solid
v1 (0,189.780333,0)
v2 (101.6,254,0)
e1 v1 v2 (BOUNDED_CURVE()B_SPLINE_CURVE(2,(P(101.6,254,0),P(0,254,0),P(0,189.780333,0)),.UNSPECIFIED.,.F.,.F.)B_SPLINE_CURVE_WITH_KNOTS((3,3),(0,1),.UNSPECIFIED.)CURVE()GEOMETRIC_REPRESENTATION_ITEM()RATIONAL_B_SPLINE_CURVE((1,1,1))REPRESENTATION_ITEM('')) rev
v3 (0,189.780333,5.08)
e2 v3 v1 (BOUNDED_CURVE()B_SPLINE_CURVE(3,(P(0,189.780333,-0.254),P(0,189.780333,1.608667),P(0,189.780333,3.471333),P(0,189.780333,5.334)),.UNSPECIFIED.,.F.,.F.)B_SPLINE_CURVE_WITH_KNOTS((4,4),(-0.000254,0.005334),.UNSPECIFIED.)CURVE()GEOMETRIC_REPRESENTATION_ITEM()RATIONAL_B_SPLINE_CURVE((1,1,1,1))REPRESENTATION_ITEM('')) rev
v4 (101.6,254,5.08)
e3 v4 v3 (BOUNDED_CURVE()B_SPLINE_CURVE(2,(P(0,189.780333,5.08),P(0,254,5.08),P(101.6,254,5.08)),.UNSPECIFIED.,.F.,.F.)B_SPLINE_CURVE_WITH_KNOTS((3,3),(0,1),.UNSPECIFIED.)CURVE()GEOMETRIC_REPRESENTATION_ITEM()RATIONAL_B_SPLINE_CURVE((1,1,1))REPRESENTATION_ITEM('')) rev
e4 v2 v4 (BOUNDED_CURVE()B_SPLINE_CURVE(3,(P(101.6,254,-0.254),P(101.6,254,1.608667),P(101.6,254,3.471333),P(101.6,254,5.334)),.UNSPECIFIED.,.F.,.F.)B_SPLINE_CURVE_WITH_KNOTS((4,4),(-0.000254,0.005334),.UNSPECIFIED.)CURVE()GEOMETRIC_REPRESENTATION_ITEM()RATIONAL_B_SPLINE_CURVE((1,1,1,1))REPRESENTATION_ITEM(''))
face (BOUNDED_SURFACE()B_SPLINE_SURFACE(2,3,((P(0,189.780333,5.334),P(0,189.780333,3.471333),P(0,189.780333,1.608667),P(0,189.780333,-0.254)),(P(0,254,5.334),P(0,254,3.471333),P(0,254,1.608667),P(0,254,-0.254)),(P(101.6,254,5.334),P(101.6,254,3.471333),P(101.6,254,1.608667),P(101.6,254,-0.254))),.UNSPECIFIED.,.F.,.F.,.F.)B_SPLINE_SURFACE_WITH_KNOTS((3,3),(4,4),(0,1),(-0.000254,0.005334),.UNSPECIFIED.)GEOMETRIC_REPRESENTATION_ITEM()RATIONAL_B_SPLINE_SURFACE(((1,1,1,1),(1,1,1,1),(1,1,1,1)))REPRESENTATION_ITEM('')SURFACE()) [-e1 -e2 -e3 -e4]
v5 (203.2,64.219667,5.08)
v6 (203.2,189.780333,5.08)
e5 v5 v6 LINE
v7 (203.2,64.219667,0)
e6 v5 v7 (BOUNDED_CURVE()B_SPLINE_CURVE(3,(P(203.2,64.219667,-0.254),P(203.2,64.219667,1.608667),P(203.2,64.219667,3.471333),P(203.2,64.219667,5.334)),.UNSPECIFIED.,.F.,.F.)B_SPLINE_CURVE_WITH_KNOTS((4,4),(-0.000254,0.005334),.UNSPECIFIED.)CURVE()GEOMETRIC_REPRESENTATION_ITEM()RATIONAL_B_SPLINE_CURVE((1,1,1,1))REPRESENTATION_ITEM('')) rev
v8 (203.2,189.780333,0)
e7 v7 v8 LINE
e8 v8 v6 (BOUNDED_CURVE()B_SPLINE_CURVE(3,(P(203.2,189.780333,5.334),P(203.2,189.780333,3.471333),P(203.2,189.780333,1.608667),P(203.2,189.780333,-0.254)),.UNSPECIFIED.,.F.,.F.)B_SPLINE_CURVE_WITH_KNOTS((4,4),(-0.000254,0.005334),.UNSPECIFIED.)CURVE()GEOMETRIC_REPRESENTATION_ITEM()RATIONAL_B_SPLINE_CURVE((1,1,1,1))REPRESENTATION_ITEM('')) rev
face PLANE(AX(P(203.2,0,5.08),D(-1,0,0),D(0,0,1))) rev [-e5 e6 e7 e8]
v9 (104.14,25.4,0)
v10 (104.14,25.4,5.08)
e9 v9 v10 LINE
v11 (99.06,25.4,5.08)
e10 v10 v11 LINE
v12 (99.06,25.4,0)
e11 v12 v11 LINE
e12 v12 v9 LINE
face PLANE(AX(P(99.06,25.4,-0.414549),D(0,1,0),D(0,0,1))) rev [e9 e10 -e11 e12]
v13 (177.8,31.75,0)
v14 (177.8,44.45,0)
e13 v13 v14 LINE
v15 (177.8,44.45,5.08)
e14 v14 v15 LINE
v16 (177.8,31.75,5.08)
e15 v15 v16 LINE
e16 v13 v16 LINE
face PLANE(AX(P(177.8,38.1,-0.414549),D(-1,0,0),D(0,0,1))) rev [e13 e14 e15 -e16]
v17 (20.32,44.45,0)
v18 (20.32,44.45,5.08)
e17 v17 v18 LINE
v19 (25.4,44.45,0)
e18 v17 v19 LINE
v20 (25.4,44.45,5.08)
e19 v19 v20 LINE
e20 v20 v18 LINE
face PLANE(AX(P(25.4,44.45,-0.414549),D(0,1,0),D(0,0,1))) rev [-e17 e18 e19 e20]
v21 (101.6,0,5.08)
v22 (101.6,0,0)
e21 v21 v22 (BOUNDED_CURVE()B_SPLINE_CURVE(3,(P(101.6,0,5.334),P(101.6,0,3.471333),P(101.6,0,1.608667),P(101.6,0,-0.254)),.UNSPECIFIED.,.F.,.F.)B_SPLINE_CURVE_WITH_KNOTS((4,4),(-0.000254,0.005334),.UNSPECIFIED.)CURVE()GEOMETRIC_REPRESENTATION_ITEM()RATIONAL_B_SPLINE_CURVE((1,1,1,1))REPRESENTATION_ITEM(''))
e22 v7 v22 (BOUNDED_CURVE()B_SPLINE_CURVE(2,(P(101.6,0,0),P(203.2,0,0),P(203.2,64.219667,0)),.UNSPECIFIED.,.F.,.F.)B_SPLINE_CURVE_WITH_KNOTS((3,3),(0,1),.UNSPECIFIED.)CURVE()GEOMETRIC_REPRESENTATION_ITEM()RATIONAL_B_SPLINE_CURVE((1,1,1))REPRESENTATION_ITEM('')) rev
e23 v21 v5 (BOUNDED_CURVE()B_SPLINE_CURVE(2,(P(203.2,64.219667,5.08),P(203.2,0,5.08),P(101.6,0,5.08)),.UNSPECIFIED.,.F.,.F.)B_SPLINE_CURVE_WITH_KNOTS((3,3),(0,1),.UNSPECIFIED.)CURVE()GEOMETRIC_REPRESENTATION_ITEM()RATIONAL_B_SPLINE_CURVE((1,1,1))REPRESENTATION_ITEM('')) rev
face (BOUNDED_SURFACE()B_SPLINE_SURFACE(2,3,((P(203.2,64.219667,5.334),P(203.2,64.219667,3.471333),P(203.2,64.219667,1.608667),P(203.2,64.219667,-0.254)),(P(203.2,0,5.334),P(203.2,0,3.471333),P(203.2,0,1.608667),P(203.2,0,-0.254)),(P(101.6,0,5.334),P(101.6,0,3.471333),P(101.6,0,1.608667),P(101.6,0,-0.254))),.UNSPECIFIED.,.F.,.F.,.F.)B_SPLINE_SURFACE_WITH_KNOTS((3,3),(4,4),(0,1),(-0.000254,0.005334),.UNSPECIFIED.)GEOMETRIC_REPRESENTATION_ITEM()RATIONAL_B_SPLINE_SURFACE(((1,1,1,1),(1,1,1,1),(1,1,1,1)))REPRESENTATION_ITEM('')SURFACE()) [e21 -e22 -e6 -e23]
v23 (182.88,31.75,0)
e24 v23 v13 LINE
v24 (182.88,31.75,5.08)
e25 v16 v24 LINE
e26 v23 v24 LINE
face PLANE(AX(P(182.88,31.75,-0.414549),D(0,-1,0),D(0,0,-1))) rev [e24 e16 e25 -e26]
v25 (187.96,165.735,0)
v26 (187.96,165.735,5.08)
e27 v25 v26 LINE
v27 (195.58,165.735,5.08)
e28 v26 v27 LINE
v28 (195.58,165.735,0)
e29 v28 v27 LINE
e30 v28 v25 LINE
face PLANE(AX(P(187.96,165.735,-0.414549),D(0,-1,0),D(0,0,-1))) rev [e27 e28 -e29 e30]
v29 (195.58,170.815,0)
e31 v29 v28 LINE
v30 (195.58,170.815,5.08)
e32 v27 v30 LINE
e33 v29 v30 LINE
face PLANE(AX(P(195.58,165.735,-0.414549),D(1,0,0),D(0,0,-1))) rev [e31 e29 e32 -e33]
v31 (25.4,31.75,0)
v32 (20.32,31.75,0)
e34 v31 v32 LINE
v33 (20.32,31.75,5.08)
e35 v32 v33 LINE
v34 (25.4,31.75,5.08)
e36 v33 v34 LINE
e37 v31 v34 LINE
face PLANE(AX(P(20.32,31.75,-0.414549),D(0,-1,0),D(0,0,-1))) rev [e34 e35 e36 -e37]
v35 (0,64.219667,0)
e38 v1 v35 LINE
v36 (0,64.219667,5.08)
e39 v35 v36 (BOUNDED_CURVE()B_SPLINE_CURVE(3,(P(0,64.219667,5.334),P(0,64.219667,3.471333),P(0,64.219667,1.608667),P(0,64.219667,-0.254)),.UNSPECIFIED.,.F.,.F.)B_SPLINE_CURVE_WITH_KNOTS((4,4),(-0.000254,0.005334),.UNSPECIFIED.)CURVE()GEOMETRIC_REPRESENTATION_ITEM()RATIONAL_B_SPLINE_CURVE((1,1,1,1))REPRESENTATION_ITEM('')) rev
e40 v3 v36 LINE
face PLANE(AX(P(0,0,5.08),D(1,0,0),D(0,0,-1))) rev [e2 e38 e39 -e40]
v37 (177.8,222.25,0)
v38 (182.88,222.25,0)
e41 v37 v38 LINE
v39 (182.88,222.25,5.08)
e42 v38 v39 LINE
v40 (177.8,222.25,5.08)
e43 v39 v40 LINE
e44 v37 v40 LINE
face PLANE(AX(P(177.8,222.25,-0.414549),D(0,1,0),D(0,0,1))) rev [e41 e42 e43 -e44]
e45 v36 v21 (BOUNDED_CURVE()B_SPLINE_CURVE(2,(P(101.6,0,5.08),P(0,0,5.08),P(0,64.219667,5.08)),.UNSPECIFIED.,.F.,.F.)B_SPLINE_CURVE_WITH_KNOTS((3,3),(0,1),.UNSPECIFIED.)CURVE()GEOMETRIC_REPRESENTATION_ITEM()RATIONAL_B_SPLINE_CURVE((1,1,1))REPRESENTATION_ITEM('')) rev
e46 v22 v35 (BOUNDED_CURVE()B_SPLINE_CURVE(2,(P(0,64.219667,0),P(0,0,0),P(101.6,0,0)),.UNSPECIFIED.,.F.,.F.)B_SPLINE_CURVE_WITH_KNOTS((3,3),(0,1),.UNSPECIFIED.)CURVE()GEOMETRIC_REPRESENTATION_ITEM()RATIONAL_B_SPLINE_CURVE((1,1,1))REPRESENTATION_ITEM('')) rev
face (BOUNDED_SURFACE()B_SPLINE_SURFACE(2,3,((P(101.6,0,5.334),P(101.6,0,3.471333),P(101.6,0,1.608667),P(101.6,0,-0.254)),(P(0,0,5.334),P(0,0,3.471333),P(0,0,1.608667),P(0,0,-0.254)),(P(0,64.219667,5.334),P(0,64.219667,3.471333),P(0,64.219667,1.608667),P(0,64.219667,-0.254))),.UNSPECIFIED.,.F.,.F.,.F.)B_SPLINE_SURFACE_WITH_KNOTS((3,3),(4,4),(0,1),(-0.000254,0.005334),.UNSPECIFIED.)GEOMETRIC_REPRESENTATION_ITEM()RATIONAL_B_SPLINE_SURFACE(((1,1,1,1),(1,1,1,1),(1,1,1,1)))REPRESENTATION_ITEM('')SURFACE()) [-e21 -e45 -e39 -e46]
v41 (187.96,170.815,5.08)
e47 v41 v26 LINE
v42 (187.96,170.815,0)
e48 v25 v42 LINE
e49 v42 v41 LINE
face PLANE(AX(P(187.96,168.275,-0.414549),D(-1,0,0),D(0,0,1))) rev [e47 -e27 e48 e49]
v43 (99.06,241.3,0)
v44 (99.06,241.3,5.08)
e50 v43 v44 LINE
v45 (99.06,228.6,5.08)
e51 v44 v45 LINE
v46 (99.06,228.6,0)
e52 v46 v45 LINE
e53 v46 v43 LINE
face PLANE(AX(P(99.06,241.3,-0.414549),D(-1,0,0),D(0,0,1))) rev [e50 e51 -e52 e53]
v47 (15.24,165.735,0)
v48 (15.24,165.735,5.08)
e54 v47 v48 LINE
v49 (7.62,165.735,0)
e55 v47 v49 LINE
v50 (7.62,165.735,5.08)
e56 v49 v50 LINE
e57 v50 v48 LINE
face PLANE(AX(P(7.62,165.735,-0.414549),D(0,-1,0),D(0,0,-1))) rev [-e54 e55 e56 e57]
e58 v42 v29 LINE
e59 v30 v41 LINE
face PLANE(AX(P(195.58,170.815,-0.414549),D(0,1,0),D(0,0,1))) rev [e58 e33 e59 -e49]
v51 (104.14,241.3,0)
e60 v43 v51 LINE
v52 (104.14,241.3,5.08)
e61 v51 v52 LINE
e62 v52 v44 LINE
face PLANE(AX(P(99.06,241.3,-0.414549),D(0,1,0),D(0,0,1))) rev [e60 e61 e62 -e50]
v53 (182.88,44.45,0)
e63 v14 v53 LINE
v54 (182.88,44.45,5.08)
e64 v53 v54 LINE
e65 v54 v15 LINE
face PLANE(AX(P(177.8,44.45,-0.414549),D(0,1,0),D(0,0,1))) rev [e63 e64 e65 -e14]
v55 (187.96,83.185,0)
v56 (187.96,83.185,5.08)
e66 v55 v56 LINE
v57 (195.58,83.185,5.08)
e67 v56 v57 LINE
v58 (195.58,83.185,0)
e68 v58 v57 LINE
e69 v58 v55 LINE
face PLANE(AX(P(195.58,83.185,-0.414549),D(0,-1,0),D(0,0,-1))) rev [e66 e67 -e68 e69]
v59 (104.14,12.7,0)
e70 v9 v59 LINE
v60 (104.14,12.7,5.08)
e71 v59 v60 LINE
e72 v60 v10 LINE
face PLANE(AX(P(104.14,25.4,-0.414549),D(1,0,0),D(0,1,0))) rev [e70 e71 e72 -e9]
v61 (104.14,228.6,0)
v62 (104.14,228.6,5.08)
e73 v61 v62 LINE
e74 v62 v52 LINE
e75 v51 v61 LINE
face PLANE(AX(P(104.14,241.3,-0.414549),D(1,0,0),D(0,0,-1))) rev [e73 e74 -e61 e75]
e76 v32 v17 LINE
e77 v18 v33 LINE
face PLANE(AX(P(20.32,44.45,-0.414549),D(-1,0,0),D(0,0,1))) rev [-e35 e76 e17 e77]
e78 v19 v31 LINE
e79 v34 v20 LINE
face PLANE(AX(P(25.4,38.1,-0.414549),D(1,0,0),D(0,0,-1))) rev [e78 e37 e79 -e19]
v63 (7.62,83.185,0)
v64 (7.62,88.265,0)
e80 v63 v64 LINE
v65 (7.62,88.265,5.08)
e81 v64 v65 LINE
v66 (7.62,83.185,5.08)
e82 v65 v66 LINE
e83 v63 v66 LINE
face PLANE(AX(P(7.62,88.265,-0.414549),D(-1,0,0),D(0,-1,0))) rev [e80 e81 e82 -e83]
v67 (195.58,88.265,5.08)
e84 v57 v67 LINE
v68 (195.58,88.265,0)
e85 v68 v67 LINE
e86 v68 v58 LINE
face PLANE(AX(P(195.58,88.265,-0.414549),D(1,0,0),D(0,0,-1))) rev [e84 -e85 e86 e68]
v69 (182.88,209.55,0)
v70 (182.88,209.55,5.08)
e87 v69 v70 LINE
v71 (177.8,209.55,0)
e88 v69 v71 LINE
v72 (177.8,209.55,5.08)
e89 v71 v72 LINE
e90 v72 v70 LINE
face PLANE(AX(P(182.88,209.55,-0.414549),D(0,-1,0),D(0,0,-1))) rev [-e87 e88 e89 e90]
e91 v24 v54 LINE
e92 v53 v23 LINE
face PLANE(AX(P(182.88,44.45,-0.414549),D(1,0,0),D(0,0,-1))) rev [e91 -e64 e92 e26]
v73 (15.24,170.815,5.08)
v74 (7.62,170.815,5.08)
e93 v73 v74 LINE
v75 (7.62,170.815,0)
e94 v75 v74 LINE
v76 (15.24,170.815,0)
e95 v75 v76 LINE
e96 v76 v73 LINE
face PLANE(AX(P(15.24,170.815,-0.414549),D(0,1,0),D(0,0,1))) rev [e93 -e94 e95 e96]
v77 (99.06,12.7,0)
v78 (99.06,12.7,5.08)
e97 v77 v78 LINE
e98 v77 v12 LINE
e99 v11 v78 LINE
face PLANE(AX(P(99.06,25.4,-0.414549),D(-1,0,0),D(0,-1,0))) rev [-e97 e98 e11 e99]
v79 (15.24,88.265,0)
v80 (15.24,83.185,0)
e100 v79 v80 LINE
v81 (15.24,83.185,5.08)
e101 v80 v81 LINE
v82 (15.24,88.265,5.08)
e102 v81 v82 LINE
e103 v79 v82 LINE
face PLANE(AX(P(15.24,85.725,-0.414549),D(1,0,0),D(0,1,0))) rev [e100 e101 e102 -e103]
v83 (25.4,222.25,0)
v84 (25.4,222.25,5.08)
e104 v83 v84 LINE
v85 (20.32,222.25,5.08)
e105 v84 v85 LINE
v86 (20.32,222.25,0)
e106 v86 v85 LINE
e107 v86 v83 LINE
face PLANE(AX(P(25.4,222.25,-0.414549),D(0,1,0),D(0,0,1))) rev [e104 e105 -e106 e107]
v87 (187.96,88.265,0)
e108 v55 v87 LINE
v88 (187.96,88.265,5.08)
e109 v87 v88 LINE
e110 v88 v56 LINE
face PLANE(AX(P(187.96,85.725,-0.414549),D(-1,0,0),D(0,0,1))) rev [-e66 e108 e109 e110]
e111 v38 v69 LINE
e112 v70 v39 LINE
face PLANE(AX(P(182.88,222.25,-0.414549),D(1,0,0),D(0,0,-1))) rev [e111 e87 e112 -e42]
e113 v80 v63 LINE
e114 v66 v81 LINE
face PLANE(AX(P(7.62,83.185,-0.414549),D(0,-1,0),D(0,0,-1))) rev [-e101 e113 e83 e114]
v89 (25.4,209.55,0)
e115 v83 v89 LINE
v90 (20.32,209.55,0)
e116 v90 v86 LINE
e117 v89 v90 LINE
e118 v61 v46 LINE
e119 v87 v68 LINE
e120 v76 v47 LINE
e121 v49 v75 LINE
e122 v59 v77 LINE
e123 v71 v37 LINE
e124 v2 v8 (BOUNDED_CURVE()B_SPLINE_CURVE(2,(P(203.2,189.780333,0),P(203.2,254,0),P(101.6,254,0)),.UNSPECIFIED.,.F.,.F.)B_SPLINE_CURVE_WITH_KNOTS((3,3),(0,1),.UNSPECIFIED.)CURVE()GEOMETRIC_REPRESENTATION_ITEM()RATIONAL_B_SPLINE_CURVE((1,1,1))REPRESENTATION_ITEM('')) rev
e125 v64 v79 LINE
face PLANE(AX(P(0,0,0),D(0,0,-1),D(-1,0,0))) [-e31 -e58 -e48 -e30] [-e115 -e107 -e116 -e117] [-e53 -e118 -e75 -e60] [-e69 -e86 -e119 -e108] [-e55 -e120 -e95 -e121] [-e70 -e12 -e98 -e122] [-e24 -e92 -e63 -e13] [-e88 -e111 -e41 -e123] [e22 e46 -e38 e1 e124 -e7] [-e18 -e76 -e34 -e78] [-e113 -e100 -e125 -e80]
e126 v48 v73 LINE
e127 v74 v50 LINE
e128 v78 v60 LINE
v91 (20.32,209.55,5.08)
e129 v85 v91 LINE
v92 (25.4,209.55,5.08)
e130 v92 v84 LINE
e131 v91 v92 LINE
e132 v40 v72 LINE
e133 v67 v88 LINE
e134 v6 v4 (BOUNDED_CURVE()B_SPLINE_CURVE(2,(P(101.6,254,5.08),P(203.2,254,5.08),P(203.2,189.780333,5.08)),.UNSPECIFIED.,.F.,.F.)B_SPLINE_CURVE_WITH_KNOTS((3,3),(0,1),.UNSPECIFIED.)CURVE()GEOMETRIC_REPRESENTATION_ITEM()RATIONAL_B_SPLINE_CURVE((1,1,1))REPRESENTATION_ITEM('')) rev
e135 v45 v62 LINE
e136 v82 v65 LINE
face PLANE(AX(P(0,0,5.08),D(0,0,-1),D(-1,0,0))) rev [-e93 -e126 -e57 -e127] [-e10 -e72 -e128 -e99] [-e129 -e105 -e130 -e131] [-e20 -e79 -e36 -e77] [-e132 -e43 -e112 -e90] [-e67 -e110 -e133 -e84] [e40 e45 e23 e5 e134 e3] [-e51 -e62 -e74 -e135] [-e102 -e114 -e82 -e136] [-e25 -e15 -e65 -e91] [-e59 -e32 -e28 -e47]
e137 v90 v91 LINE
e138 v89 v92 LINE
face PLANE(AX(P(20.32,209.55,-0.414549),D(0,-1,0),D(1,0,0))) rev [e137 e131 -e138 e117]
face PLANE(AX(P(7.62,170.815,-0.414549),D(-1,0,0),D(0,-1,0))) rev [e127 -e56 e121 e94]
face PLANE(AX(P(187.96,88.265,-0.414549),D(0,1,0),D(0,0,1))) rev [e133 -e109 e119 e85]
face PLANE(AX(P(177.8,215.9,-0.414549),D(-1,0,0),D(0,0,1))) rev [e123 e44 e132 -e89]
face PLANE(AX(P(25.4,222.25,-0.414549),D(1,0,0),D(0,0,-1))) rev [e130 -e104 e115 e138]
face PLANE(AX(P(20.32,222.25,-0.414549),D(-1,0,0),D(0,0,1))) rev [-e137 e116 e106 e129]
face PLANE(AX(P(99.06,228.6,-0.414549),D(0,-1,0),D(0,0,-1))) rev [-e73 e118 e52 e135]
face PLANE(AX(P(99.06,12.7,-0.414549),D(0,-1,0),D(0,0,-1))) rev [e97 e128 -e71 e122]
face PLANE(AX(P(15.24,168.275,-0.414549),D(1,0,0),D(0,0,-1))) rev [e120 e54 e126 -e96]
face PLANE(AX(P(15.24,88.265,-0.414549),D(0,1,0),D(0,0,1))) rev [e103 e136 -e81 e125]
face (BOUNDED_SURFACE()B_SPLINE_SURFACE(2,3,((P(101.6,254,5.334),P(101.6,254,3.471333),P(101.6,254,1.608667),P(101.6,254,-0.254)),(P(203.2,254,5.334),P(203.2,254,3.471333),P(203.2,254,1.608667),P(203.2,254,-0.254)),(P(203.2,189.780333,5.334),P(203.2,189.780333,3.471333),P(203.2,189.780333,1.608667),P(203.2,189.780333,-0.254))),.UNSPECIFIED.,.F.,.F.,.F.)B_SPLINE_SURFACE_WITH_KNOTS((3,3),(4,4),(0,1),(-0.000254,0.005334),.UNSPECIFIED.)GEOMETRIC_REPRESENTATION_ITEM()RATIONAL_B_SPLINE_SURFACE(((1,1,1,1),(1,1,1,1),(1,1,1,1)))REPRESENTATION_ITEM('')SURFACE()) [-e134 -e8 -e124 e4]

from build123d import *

# Parameters (mm, degrees)
SKETCH1_W           = 203.2
SKETCH1_H           = 254
BOSS_EXTRUDE1_DEPTH = 5.08
FILLET1_SIZE        = 64.219666667
FILLET1_SIZE_2      = 101.6
SKETCH14_W          = 5.08
SKETCH14_H          = 12.7
CUT_EXTRUDE2_DEPTH  = 326.318377121
CUT_EXTRUDE3_DEPTH  = 326.318377121


with BuildPart() as part:
    # Sketch1 → Boss-Extrude1 (new body)
    with BuildSketch(Plane.XY):
        with Locations((101.6, 127)):
            Rectangle(SKETCH1_W, SKETCH1_H)
    extrude(amount=BOSS_EXTRUDE1_DEPTH)

    # Fillet1
    # a fillet whose section is not a circle: 101.6, 64.219666667 mm, written as the material it takes off along each edge
    with BuildSketch(Plane(origin=(203.2, 254, -254), x_dir=(0, -1, 0), z_dir=(0, 0, 1))) as fillet1_piece_1:
        with BuildLine():
            Bezier((FILLET1_SIZE, 0), (0, 0), (0, -FILLET1_SIZE_2), weights=[1, 1, 1])
            Line((0, -FILLET1_SIZE_2), (0, 0))
            Line((0, 0), (FILLET1_SIZE, 0))
        make_face()
    extrude(amount=513.08, mode=Mode.SUBTRACT)
    with BuildSketch(Plane(origin=(0, 254, -254), x_dir=(1, 0, 0), z_dir=(0, 0, 1)), Plane(origin=(203.2, 0, -254), x_dir=(-1, 0, 0), z_dir=(0, 0, 1))) as fillet1_piece_2:
        with BuildLine():
            Bezier((FILLET1_SIZE_2, 0), (0, 0), (0, -FILLET1_SIZE), weights=[1, 1, 1])
            Line((0, -FILLET1_SIZE), (0, 0))
            Line((0, 0), (FILLET1_SIZE_2, 0))
        make_face()
    extrude(amount=513.08, mode=Mode.SUBTRACT)
    with BuildSketch(Plane(origin=(0, 0, -254), x_dir=(1, 0, 0), z_dir=(0, 0, 1))) as fillet1_piece_3:
        with BuildLine():
            Bezier((FILLET1_SIZE_2, 0), (0, 0), (0, FILLET1_SIZE), weights=[1, 1, 1])
            Line((0, FILLET1_SIZE), (0, 0))
            Line((0, 0), (FILLET1_SIZE_2, 0))
        make_face()
    extrude(amount=513.08, mode=Mode.SUBTRACT)

    # Sketch14 → Cut-Extrude2 (cut, through all)
    with BuildSketch(Plane.XY.offset(5.08)):
        with Locations((101.6, 234.95)):
            Rectangle(SKETCH14_W, SKETCH14_H)
        with Locations((101.6, 19.05)):
            Rectangle(SKETCH14_W, SKETCH14_H)
    extrude(amount=-CUT_EXTRUDE2_DEPTH, mode=Mode.SUBTRACT)

    # Sketch13 → Cut-Extrude3 (cut, through all)
    with BuildSketch(Plane.XY.offset(5.08)):
        Polygon((25.4, 222.25), (20.32, 222.25), (20.32, 209.55), (25.4, 209.55), (25.4, 215.9), align=None)
        Polygon((177.8, 215.9), (177.8, 222.25), (182.88, 222.25), (182.88, 209.55), (177.8, 209.55), align=None)
        Polygon((177.8, 38.1), (177.8, 44.45), (182.88, 44.45), (182.88, 31.75), (177.8, 31.75), align=None)
        Polygon((25.4, 38.1), (25.4, 44.45), (20.32, 44.45), (20.32, 31.75), (25.4, 31.75), align=None)
        Polygon((187.96, 168.275), (187.96, 165.735), (195.58, 165.735), (195.58, 170.815), (187.96, 170.815), align=None)
        Polygon((187.96, 85.725), (187.96, 88.265), (195.58, 88.265), (195.58, 83.185), (187.96, 83.185), align=None)
        Polygon((15.24, 168.275), (15.24, 170.815), (7.62, 170.815), (7.62, 165.735), (15.24, 165.735), align=None)
        Polygon((15.24, 85.725), (15.24, 88.265), (7.62, 88.265), (7.62, 83.185), (15.24, 83.185), align=None)
    extrude(amount=-CUT_EXTRUDE3_DEPTH, mode=Mode.SUBTRACT)


solid = part.part
